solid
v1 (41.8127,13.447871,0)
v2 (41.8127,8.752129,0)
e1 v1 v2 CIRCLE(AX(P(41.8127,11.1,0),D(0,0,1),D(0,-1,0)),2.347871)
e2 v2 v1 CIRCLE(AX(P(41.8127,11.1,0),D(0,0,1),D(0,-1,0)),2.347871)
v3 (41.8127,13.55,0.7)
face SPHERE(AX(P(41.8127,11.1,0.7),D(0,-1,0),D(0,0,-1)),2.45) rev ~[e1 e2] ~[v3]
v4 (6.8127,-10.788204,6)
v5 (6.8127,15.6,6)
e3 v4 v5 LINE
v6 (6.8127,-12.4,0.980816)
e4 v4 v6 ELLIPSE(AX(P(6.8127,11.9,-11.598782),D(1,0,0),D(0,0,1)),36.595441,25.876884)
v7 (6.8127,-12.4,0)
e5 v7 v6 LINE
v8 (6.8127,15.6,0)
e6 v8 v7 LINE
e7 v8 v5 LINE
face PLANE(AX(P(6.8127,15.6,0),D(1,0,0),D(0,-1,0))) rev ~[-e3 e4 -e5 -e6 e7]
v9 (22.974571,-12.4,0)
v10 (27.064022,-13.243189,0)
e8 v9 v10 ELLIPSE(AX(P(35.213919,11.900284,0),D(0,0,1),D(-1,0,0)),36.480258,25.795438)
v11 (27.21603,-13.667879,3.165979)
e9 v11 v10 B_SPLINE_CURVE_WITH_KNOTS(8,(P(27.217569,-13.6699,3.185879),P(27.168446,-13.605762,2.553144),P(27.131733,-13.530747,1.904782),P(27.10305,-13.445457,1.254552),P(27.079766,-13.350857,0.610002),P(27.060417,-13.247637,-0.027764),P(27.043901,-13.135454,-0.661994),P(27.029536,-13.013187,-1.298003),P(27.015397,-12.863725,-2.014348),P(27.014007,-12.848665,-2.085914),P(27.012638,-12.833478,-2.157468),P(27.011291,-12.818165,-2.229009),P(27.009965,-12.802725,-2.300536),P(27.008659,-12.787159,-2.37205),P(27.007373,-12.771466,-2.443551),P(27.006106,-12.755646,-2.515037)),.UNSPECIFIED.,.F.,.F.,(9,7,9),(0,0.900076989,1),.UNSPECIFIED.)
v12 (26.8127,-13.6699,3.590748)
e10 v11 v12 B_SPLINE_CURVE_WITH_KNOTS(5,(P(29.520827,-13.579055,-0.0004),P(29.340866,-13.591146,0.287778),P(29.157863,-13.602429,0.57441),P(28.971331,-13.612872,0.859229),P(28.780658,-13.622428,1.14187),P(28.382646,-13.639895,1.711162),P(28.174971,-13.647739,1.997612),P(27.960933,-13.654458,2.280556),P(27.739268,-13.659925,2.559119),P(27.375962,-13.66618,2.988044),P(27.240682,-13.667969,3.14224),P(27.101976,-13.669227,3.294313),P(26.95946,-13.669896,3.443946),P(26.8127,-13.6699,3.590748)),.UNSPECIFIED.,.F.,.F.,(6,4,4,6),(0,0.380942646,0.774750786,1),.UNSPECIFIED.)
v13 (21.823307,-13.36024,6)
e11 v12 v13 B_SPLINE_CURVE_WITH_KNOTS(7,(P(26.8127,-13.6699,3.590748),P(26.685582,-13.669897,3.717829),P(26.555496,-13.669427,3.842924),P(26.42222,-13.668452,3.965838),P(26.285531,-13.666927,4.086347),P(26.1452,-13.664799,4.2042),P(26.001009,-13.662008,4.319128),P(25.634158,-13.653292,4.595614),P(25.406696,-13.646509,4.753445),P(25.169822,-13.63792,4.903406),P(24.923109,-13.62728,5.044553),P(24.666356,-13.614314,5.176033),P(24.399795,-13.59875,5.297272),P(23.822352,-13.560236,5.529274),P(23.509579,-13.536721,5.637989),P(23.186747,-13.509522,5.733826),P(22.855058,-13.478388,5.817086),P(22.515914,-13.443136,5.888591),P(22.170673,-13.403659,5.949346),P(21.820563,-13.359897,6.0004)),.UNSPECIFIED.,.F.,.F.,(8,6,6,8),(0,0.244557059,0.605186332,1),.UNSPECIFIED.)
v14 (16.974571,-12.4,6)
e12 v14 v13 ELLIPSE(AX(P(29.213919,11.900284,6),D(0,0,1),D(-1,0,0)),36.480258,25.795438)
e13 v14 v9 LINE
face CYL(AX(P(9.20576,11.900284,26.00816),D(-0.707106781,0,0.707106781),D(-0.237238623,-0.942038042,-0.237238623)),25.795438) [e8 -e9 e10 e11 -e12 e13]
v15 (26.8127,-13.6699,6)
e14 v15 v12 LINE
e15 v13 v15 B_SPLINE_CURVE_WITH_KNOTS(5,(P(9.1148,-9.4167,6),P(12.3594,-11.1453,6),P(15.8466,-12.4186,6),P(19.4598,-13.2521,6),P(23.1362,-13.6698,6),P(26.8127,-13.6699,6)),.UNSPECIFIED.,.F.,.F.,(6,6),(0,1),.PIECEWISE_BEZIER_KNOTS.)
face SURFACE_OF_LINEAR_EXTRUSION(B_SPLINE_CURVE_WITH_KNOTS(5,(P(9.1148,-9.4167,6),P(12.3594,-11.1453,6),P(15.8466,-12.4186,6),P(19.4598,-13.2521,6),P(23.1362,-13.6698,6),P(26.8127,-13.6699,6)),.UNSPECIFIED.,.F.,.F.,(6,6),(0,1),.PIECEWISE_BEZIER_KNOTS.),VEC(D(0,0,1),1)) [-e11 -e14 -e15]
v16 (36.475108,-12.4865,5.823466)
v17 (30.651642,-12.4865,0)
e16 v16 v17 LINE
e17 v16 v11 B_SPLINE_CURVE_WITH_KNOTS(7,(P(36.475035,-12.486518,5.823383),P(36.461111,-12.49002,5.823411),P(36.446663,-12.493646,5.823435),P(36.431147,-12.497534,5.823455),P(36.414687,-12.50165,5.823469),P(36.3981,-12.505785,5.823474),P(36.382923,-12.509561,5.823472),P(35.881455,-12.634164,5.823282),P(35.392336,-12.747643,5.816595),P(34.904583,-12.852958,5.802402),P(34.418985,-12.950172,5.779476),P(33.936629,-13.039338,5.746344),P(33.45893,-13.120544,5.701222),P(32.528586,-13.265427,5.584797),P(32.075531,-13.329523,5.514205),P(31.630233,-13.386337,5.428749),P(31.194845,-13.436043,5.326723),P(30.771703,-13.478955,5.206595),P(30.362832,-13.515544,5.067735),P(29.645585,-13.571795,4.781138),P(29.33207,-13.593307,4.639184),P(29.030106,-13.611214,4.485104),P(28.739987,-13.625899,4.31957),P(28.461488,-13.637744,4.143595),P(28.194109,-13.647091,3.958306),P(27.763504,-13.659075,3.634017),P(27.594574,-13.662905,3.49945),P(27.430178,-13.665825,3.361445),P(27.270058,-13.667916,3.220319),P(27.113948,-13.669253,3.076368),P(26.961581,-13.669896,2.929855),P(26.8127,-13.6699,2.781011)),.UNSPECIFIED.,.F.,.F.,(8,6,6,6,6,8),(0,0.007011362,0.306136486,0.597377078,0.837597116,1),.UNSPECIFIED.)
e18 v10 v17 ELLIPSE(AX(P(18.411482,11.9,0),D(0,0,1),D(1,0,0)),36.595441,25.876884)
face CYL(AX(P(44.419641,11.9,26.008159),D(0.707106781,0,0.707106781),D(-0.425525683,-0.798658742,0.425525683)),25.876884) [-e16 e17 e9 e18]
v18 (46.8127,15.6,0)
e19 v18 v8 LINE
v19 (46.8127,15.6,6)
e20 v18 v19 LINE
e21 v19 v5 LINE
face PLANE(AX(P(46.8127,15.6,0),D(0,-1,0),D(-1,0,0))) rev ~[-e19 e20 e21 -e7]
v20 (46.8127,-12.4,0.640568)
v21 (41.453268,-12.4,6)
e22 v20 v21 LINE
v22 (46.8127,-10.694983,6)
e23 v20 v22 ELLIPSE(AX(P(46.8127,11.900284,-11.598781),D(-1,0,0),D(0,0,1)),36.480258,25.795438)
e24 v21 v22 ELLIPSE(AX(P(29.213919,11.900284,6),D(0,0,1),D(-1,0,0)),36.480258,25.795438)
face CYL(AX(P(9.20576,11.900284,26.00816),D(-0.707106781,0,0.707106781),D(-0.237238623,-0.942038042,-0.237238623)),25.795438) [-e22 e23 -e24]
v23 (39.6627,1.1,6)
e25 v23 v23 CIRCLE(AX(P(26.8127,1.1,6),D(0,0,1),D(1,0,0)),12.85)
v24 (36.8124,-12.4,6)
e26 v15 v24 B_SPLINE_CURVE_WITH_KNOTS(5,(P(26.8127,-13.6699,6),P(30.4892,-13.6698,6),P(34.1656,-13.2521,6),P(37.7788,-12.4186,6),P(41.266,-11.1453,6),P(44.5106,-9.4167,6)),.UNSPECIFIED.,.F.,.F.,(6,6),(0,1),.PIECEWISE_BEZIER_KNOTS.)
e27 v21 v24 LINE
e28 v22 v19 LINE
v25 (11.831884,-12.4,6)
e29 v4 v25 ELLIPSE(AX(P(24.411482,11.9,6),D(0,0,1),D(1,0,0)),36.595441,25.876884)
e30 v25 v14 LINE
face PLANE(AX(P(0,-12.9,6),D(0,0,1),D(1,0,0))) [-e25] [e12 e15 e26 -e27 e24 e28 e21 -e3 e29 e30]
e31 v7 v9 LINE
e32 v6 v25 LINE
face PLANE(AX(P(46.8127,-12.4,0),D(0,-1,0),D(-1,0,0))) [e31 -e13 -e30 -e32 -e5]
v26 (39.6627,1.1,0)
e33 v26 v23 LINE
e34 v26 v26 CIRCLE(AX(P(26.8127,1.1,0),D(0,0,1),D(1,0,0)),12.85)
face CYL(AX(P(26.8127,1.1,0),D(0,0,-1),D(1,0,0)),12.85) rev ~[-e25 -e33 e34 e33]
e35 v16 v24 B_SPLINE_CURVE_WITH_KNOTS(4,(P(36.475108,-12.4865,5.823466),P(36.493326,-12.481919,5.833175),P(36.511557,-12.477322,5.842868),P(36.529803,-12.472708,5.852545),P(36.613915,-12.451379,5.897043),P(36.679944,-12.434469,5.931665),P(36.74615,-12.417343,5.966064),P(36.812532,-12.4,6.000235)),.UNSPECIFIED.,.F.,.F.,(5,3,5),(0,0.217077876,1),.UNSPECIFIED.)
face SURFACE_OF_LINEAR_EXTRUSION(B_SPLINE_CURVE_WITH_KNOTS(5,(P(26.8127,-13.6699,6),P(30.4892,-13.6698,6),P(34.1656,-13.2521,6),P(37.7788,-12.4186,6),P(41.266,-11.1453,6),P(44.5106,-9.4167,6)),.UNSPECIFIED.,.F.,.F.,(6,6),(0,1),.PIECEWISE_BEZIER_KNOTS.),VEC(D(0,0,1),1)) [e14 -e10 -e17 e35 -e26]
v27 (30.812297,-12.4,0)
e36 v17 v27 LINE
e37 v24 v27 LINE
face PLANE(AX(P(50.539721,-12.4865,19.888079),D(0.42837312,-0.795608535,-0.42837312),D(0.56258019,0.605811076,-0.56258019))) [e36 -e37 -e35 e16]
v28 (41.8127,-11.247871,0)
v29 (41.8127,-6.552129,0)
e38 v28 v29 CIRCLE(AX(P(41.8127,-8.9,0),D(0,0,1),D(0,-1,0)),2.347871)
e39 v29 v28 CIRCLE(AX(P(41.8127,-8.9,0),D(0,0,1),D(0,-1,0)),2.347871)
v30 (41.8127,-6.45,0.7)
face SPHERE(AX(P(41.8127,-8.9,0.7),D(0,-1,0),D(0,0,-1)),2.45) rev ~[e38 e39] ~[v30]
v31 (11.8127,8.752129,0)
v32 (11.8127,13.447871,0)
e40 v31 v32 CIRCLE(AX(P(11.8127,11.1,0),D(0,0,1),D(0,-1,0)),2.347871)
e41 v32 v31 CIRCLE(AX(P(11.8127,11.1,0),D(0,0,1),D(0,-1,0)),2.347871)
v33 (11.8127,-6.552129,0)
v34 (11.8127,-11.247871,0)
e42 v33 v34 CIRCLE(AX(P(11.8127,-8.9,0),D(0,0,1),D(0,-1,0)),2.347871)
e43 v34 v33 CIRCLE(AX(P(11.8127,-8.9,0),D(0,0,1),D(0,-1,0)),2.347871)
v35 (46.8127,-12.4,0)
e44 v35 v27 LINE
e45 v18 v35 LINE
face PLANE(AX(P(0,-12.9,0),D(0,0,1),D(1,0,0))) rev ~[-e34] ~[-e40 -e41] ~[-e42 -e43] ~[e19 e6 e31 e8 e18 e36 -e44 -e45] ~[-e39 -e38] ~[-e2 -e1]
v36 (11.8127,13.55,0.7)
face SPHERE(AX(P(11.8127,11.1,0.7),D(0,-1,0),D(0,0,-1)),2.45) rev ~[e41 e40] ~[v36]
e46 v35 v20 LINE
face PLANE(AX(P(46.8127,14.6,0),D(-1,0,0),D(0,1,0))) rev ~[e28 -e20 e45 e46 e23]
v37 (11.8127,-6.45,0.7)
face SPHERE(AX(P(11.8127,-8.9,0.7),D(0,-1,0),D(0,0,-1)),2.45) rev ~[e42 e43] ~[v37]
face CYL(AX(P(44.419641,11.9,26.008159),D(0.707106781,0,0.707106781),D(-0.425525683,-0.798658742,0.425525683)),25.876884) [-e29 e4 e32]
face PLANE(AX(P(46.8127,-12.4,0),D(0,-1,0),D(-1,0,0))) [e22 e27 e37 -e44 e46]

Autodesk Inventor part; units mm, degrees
ref_plane "YZ Plane" through (0, 0, 0) normal (1, 0, 0) x (0, 1, 0)
ref_plane "XZ Plane" through (0, 0, 0) normal (0, 1, 0) x (-1, 0, 0)
ref_plane "Work Plane1" through (0, -12.9, 0) normal (0, 0, 1) x (1, 0, 0)
sketch "Sketch1" plane through (0, -12.9, 0) normal (0, 0, 1) x (1, 0, 0)
  circle A0 centre (26.8127, 14) radius 1.4 construction
  line L0 (6.8127, 27.5) -> (46.8127, 27.5)
  line L1 (46.8127, 27.5) -> (46.8127, 0.5)
  line L2 (46.8127, 0.5) -> (6.8127, 0.5)
  line L3 (6.8127, 0.5) -> (6.8127, 27.5)
  line L4 (6.8127, 27.5) -> (46.8127, 0.5) construction
  line L5 (46.8127, 27.5) -> (6.8127, 0.5) construction
  circle A1 centre (26.8127, 14) radius 12.7 construction
  circle A2 centre (26.8127, 14) radius 12.85
  line L6 (6.8127, 27.5) -> (46.8127, 27.5)
  line L7 (46.8127, 27.5) -> (46.8127, 28.5)
  line L8 (46.8127, 28.5) -> (6.8127, 28.5)
  line L9 (6.8127, 28.5) -> (6.8127, 27.5)
  point P0 (0, 12.9)
  dimension "d0" = 40
  dimension "d1" = 27
  dimension "d14" = 1
  dimension "d25" = 25.7
ref_plane "Work Plane2" through (14.3627, 1.55, 6) normal (0, 0, 1) x (1, 0, 0)
extrude "Extrusion1" add sketch "Sketch1" along normal up to surface (6 mm away)
ref_plane "Work Plane3" through (11.8127, 24, 6) normal (-1, 0, 0) x (0, 0, 1)
sketch "Sketch2" plane through (11.8127, 24, 6) normal (-1, 0, 0) x (0, 0, 1)
  line L0 (-13.2187, 0) -> (3.0119, 0) projected
  line L1 (-6, -35.75) -> (-6, -10.05) projected
  line L2 (-10.9, -34.4) -> (0.6933, -34.4)
  line L3 (-10.9, -31.4) -> (0.6933, -31.4)
  line L4 (-10.9, -14.4) -> (0.6933, -14.4)
  line L5 (-10.9, -11.4) -> (0.6933, -11.4)
  arc A0 (-5.3, -10.45) -> (-5.3, -15.35) centre (-5.3, -12.9) ccw
  arc A1 (-5.4335, -30.45) -> (-5.4335, -35.35) centre (-5.4335, -32.9) ccw
  line L6 (-5.4335, -35.35) -> (-5.4335, -30.45)
  line L7 (-5.3, -15.35) -> (-5.3, -10.45)
  point P0 (-6, -24)
  dimension "d22" = 4.9
  dimension "d23" = 1.5
  dimension "d24" = 1.5
revolve "Revolution1" cut sketch "Sketch2" angle 360 about axis through (11.8127, 8.65, 0.7) along (0, 1, 0) contours A0 L4 L1 | L1 L4 L7 A0 | L4 A0 L5 L1 | L1 L5 L7 L4 | L5 A0 L1 | L1 A0 L7 L5
pattern_linear "Rectangular Pattern1" count 2 spacing 20 along (0, -1, 0) count 2 spacing 30 along (1, 0, 0) of "Revolution1"
sketch "Sketch3" plane through (6.8127, -12.4, 6) normal (0, 0, 1) x (1, 0, 0)
  ellipse E0 centre (20, 24.3) end of major axis (41.0718, 24.3) minor radius 14.9 (7.3193, 12.4) -> (20, 9.4) ccw construction
  ellipse E1 centre (20, 24.3) end of major axis (41.0718, 24.3) minor radius 14.9 (20, 9.4) -> (32.6807, 12.4) ccw construction
  circle A0 centre (20, 13.5) radius 12.85 construction
  line L0 (40, 0) -> (0, 0) construction
  line L1 (40, 28) -> (40, 0) construction
  line L2 (0, 28) -> (40, 28) construction
  line L3 (0, 0) -> (0, 28) construction
  circle A1 centre (20, 13.5) radius 12.85 construction
  line L4 (40, 0) -> (0, 0) projected
  line L5 (10.0003, 0) -> (29.9997, 0)
  spline S0 degree 5 poles (2.3021, 2.9833) (5.5467, 1.2547) (9.0339, -0.0186) (12.6471, -0.8521) (16.3235, -1.2698) (20, -1.2699) knots 0 0 0 0 0 0 1 1 1 1 1 1
  spline S1 degree 5 poles (20, -1.2699) (23.6765, -1.2698) (27.3529, -0.8521) (30.9661, -0.0186) (34.4533, 1.2547) (37.6979, 2.9833) knots 0 0 0 0 0 0 1 1 1 1 1 1
  point P0 (-6.8127, 12.4)
extrude "Extrusion2" add sketch "Sketch3" against normal up to surface (6 mm away)
ref_plane "Work Plane4" through (26.8127, 23.9, 43.6151) normal (-0.7071068, 0, 0.7071068) x (-0.7071068, 0, -0.7071068)
sketch "Sketch4" plane through (26.8127, 23.9, 43.6151) normal (-0.7071068, 0, 0.7071068) x (-0.7071068, 0, -0.7071068)
  arc A0 (33.8666, 23.9) -> (15.9334, 23.9) centre (24.9, 12) ccw projected
  ellipse E0 centre (26.5979, 22.8) end of major axis (26.5979, 35.65) minor radius 9.0863 construction
  line L0 (12.4558, 36.3) -> (19.5271, 36.3) construction
  line L1 (12.4558, 8.3) -> (12.4558, 36.3) construction
  line L2 (40.74, 8.3) -> (12.4558, 8.3) construction
  line L3 (40.74, 36.3) -> (40.74, 8.3) construction
  line L4 (33.6687, 36.3) -> (40.74, 36.3) projected
  arc A1 (33.5545, 36.3) -> (9.1298, 32.4131) centre (24.9, 12) ccw
  line L5 (33.6687, 36.3) -> (40.74, 36.3) projected
  line L6 (33.5545, 36.3) -> (40.74, 36.3)
  line L7 (40.74, 36.3) -> (40.74, 42.5179)
  line L8 (40.74, 42.5179) -> (9.2813, 42.9694)
  line L9 (9.2813, 42.9694) -> (9.1298, 32.4131)
  point P0 (49.8, 23.9)
extrude "Extrusion3" cut sketch "Sketch4" against normal through all
ref_plane "Work Plane5" through (62.0266, 23.9, 8.4012) normal (0.7071068, 0, 0.7071068) x (-0.7071068, 0, 0.7071068)
sketch "Sketch5" plane through (62.0266, 23.9, 8.4012) normal (0.7071068, 0, 0.7071068) x (-0.7071068, 0, 0.7071068)
  arc A0 (33.8666, 23.9) -> (15.9334, 23.9) centre (24.9, 12) ccw projected
  arc A1 (40.4723, 32.6668) -> (9.3277, 32.6668) centre (24.9, 12) ccw
  line L0 (16.1313, 36.3) -> (11.8886, 36.3) projected
  line L1 (16.1313, 36.3) -> (16.2449, 36.3865) construction
  line L2 (16.2449, 36.3865) -> (16.1313, 36.3)
  line L3 (40.4723, 32.6668) -> (40.4723, 41.9024)
  line L4 (40.4723, 41.9024) -> (12.0732, 41.9024)
  line L5 (12.0732, 41.9024) -> (11.8886, 36.3)
  point P0 (37.9189, 23.9)
extrude "Extrusion4" cut sketch "Sketch5" against normal through all
properties part number "20_Cube_Insert_Kinematic_Mirrormount_45_Thorlabsadapter"
